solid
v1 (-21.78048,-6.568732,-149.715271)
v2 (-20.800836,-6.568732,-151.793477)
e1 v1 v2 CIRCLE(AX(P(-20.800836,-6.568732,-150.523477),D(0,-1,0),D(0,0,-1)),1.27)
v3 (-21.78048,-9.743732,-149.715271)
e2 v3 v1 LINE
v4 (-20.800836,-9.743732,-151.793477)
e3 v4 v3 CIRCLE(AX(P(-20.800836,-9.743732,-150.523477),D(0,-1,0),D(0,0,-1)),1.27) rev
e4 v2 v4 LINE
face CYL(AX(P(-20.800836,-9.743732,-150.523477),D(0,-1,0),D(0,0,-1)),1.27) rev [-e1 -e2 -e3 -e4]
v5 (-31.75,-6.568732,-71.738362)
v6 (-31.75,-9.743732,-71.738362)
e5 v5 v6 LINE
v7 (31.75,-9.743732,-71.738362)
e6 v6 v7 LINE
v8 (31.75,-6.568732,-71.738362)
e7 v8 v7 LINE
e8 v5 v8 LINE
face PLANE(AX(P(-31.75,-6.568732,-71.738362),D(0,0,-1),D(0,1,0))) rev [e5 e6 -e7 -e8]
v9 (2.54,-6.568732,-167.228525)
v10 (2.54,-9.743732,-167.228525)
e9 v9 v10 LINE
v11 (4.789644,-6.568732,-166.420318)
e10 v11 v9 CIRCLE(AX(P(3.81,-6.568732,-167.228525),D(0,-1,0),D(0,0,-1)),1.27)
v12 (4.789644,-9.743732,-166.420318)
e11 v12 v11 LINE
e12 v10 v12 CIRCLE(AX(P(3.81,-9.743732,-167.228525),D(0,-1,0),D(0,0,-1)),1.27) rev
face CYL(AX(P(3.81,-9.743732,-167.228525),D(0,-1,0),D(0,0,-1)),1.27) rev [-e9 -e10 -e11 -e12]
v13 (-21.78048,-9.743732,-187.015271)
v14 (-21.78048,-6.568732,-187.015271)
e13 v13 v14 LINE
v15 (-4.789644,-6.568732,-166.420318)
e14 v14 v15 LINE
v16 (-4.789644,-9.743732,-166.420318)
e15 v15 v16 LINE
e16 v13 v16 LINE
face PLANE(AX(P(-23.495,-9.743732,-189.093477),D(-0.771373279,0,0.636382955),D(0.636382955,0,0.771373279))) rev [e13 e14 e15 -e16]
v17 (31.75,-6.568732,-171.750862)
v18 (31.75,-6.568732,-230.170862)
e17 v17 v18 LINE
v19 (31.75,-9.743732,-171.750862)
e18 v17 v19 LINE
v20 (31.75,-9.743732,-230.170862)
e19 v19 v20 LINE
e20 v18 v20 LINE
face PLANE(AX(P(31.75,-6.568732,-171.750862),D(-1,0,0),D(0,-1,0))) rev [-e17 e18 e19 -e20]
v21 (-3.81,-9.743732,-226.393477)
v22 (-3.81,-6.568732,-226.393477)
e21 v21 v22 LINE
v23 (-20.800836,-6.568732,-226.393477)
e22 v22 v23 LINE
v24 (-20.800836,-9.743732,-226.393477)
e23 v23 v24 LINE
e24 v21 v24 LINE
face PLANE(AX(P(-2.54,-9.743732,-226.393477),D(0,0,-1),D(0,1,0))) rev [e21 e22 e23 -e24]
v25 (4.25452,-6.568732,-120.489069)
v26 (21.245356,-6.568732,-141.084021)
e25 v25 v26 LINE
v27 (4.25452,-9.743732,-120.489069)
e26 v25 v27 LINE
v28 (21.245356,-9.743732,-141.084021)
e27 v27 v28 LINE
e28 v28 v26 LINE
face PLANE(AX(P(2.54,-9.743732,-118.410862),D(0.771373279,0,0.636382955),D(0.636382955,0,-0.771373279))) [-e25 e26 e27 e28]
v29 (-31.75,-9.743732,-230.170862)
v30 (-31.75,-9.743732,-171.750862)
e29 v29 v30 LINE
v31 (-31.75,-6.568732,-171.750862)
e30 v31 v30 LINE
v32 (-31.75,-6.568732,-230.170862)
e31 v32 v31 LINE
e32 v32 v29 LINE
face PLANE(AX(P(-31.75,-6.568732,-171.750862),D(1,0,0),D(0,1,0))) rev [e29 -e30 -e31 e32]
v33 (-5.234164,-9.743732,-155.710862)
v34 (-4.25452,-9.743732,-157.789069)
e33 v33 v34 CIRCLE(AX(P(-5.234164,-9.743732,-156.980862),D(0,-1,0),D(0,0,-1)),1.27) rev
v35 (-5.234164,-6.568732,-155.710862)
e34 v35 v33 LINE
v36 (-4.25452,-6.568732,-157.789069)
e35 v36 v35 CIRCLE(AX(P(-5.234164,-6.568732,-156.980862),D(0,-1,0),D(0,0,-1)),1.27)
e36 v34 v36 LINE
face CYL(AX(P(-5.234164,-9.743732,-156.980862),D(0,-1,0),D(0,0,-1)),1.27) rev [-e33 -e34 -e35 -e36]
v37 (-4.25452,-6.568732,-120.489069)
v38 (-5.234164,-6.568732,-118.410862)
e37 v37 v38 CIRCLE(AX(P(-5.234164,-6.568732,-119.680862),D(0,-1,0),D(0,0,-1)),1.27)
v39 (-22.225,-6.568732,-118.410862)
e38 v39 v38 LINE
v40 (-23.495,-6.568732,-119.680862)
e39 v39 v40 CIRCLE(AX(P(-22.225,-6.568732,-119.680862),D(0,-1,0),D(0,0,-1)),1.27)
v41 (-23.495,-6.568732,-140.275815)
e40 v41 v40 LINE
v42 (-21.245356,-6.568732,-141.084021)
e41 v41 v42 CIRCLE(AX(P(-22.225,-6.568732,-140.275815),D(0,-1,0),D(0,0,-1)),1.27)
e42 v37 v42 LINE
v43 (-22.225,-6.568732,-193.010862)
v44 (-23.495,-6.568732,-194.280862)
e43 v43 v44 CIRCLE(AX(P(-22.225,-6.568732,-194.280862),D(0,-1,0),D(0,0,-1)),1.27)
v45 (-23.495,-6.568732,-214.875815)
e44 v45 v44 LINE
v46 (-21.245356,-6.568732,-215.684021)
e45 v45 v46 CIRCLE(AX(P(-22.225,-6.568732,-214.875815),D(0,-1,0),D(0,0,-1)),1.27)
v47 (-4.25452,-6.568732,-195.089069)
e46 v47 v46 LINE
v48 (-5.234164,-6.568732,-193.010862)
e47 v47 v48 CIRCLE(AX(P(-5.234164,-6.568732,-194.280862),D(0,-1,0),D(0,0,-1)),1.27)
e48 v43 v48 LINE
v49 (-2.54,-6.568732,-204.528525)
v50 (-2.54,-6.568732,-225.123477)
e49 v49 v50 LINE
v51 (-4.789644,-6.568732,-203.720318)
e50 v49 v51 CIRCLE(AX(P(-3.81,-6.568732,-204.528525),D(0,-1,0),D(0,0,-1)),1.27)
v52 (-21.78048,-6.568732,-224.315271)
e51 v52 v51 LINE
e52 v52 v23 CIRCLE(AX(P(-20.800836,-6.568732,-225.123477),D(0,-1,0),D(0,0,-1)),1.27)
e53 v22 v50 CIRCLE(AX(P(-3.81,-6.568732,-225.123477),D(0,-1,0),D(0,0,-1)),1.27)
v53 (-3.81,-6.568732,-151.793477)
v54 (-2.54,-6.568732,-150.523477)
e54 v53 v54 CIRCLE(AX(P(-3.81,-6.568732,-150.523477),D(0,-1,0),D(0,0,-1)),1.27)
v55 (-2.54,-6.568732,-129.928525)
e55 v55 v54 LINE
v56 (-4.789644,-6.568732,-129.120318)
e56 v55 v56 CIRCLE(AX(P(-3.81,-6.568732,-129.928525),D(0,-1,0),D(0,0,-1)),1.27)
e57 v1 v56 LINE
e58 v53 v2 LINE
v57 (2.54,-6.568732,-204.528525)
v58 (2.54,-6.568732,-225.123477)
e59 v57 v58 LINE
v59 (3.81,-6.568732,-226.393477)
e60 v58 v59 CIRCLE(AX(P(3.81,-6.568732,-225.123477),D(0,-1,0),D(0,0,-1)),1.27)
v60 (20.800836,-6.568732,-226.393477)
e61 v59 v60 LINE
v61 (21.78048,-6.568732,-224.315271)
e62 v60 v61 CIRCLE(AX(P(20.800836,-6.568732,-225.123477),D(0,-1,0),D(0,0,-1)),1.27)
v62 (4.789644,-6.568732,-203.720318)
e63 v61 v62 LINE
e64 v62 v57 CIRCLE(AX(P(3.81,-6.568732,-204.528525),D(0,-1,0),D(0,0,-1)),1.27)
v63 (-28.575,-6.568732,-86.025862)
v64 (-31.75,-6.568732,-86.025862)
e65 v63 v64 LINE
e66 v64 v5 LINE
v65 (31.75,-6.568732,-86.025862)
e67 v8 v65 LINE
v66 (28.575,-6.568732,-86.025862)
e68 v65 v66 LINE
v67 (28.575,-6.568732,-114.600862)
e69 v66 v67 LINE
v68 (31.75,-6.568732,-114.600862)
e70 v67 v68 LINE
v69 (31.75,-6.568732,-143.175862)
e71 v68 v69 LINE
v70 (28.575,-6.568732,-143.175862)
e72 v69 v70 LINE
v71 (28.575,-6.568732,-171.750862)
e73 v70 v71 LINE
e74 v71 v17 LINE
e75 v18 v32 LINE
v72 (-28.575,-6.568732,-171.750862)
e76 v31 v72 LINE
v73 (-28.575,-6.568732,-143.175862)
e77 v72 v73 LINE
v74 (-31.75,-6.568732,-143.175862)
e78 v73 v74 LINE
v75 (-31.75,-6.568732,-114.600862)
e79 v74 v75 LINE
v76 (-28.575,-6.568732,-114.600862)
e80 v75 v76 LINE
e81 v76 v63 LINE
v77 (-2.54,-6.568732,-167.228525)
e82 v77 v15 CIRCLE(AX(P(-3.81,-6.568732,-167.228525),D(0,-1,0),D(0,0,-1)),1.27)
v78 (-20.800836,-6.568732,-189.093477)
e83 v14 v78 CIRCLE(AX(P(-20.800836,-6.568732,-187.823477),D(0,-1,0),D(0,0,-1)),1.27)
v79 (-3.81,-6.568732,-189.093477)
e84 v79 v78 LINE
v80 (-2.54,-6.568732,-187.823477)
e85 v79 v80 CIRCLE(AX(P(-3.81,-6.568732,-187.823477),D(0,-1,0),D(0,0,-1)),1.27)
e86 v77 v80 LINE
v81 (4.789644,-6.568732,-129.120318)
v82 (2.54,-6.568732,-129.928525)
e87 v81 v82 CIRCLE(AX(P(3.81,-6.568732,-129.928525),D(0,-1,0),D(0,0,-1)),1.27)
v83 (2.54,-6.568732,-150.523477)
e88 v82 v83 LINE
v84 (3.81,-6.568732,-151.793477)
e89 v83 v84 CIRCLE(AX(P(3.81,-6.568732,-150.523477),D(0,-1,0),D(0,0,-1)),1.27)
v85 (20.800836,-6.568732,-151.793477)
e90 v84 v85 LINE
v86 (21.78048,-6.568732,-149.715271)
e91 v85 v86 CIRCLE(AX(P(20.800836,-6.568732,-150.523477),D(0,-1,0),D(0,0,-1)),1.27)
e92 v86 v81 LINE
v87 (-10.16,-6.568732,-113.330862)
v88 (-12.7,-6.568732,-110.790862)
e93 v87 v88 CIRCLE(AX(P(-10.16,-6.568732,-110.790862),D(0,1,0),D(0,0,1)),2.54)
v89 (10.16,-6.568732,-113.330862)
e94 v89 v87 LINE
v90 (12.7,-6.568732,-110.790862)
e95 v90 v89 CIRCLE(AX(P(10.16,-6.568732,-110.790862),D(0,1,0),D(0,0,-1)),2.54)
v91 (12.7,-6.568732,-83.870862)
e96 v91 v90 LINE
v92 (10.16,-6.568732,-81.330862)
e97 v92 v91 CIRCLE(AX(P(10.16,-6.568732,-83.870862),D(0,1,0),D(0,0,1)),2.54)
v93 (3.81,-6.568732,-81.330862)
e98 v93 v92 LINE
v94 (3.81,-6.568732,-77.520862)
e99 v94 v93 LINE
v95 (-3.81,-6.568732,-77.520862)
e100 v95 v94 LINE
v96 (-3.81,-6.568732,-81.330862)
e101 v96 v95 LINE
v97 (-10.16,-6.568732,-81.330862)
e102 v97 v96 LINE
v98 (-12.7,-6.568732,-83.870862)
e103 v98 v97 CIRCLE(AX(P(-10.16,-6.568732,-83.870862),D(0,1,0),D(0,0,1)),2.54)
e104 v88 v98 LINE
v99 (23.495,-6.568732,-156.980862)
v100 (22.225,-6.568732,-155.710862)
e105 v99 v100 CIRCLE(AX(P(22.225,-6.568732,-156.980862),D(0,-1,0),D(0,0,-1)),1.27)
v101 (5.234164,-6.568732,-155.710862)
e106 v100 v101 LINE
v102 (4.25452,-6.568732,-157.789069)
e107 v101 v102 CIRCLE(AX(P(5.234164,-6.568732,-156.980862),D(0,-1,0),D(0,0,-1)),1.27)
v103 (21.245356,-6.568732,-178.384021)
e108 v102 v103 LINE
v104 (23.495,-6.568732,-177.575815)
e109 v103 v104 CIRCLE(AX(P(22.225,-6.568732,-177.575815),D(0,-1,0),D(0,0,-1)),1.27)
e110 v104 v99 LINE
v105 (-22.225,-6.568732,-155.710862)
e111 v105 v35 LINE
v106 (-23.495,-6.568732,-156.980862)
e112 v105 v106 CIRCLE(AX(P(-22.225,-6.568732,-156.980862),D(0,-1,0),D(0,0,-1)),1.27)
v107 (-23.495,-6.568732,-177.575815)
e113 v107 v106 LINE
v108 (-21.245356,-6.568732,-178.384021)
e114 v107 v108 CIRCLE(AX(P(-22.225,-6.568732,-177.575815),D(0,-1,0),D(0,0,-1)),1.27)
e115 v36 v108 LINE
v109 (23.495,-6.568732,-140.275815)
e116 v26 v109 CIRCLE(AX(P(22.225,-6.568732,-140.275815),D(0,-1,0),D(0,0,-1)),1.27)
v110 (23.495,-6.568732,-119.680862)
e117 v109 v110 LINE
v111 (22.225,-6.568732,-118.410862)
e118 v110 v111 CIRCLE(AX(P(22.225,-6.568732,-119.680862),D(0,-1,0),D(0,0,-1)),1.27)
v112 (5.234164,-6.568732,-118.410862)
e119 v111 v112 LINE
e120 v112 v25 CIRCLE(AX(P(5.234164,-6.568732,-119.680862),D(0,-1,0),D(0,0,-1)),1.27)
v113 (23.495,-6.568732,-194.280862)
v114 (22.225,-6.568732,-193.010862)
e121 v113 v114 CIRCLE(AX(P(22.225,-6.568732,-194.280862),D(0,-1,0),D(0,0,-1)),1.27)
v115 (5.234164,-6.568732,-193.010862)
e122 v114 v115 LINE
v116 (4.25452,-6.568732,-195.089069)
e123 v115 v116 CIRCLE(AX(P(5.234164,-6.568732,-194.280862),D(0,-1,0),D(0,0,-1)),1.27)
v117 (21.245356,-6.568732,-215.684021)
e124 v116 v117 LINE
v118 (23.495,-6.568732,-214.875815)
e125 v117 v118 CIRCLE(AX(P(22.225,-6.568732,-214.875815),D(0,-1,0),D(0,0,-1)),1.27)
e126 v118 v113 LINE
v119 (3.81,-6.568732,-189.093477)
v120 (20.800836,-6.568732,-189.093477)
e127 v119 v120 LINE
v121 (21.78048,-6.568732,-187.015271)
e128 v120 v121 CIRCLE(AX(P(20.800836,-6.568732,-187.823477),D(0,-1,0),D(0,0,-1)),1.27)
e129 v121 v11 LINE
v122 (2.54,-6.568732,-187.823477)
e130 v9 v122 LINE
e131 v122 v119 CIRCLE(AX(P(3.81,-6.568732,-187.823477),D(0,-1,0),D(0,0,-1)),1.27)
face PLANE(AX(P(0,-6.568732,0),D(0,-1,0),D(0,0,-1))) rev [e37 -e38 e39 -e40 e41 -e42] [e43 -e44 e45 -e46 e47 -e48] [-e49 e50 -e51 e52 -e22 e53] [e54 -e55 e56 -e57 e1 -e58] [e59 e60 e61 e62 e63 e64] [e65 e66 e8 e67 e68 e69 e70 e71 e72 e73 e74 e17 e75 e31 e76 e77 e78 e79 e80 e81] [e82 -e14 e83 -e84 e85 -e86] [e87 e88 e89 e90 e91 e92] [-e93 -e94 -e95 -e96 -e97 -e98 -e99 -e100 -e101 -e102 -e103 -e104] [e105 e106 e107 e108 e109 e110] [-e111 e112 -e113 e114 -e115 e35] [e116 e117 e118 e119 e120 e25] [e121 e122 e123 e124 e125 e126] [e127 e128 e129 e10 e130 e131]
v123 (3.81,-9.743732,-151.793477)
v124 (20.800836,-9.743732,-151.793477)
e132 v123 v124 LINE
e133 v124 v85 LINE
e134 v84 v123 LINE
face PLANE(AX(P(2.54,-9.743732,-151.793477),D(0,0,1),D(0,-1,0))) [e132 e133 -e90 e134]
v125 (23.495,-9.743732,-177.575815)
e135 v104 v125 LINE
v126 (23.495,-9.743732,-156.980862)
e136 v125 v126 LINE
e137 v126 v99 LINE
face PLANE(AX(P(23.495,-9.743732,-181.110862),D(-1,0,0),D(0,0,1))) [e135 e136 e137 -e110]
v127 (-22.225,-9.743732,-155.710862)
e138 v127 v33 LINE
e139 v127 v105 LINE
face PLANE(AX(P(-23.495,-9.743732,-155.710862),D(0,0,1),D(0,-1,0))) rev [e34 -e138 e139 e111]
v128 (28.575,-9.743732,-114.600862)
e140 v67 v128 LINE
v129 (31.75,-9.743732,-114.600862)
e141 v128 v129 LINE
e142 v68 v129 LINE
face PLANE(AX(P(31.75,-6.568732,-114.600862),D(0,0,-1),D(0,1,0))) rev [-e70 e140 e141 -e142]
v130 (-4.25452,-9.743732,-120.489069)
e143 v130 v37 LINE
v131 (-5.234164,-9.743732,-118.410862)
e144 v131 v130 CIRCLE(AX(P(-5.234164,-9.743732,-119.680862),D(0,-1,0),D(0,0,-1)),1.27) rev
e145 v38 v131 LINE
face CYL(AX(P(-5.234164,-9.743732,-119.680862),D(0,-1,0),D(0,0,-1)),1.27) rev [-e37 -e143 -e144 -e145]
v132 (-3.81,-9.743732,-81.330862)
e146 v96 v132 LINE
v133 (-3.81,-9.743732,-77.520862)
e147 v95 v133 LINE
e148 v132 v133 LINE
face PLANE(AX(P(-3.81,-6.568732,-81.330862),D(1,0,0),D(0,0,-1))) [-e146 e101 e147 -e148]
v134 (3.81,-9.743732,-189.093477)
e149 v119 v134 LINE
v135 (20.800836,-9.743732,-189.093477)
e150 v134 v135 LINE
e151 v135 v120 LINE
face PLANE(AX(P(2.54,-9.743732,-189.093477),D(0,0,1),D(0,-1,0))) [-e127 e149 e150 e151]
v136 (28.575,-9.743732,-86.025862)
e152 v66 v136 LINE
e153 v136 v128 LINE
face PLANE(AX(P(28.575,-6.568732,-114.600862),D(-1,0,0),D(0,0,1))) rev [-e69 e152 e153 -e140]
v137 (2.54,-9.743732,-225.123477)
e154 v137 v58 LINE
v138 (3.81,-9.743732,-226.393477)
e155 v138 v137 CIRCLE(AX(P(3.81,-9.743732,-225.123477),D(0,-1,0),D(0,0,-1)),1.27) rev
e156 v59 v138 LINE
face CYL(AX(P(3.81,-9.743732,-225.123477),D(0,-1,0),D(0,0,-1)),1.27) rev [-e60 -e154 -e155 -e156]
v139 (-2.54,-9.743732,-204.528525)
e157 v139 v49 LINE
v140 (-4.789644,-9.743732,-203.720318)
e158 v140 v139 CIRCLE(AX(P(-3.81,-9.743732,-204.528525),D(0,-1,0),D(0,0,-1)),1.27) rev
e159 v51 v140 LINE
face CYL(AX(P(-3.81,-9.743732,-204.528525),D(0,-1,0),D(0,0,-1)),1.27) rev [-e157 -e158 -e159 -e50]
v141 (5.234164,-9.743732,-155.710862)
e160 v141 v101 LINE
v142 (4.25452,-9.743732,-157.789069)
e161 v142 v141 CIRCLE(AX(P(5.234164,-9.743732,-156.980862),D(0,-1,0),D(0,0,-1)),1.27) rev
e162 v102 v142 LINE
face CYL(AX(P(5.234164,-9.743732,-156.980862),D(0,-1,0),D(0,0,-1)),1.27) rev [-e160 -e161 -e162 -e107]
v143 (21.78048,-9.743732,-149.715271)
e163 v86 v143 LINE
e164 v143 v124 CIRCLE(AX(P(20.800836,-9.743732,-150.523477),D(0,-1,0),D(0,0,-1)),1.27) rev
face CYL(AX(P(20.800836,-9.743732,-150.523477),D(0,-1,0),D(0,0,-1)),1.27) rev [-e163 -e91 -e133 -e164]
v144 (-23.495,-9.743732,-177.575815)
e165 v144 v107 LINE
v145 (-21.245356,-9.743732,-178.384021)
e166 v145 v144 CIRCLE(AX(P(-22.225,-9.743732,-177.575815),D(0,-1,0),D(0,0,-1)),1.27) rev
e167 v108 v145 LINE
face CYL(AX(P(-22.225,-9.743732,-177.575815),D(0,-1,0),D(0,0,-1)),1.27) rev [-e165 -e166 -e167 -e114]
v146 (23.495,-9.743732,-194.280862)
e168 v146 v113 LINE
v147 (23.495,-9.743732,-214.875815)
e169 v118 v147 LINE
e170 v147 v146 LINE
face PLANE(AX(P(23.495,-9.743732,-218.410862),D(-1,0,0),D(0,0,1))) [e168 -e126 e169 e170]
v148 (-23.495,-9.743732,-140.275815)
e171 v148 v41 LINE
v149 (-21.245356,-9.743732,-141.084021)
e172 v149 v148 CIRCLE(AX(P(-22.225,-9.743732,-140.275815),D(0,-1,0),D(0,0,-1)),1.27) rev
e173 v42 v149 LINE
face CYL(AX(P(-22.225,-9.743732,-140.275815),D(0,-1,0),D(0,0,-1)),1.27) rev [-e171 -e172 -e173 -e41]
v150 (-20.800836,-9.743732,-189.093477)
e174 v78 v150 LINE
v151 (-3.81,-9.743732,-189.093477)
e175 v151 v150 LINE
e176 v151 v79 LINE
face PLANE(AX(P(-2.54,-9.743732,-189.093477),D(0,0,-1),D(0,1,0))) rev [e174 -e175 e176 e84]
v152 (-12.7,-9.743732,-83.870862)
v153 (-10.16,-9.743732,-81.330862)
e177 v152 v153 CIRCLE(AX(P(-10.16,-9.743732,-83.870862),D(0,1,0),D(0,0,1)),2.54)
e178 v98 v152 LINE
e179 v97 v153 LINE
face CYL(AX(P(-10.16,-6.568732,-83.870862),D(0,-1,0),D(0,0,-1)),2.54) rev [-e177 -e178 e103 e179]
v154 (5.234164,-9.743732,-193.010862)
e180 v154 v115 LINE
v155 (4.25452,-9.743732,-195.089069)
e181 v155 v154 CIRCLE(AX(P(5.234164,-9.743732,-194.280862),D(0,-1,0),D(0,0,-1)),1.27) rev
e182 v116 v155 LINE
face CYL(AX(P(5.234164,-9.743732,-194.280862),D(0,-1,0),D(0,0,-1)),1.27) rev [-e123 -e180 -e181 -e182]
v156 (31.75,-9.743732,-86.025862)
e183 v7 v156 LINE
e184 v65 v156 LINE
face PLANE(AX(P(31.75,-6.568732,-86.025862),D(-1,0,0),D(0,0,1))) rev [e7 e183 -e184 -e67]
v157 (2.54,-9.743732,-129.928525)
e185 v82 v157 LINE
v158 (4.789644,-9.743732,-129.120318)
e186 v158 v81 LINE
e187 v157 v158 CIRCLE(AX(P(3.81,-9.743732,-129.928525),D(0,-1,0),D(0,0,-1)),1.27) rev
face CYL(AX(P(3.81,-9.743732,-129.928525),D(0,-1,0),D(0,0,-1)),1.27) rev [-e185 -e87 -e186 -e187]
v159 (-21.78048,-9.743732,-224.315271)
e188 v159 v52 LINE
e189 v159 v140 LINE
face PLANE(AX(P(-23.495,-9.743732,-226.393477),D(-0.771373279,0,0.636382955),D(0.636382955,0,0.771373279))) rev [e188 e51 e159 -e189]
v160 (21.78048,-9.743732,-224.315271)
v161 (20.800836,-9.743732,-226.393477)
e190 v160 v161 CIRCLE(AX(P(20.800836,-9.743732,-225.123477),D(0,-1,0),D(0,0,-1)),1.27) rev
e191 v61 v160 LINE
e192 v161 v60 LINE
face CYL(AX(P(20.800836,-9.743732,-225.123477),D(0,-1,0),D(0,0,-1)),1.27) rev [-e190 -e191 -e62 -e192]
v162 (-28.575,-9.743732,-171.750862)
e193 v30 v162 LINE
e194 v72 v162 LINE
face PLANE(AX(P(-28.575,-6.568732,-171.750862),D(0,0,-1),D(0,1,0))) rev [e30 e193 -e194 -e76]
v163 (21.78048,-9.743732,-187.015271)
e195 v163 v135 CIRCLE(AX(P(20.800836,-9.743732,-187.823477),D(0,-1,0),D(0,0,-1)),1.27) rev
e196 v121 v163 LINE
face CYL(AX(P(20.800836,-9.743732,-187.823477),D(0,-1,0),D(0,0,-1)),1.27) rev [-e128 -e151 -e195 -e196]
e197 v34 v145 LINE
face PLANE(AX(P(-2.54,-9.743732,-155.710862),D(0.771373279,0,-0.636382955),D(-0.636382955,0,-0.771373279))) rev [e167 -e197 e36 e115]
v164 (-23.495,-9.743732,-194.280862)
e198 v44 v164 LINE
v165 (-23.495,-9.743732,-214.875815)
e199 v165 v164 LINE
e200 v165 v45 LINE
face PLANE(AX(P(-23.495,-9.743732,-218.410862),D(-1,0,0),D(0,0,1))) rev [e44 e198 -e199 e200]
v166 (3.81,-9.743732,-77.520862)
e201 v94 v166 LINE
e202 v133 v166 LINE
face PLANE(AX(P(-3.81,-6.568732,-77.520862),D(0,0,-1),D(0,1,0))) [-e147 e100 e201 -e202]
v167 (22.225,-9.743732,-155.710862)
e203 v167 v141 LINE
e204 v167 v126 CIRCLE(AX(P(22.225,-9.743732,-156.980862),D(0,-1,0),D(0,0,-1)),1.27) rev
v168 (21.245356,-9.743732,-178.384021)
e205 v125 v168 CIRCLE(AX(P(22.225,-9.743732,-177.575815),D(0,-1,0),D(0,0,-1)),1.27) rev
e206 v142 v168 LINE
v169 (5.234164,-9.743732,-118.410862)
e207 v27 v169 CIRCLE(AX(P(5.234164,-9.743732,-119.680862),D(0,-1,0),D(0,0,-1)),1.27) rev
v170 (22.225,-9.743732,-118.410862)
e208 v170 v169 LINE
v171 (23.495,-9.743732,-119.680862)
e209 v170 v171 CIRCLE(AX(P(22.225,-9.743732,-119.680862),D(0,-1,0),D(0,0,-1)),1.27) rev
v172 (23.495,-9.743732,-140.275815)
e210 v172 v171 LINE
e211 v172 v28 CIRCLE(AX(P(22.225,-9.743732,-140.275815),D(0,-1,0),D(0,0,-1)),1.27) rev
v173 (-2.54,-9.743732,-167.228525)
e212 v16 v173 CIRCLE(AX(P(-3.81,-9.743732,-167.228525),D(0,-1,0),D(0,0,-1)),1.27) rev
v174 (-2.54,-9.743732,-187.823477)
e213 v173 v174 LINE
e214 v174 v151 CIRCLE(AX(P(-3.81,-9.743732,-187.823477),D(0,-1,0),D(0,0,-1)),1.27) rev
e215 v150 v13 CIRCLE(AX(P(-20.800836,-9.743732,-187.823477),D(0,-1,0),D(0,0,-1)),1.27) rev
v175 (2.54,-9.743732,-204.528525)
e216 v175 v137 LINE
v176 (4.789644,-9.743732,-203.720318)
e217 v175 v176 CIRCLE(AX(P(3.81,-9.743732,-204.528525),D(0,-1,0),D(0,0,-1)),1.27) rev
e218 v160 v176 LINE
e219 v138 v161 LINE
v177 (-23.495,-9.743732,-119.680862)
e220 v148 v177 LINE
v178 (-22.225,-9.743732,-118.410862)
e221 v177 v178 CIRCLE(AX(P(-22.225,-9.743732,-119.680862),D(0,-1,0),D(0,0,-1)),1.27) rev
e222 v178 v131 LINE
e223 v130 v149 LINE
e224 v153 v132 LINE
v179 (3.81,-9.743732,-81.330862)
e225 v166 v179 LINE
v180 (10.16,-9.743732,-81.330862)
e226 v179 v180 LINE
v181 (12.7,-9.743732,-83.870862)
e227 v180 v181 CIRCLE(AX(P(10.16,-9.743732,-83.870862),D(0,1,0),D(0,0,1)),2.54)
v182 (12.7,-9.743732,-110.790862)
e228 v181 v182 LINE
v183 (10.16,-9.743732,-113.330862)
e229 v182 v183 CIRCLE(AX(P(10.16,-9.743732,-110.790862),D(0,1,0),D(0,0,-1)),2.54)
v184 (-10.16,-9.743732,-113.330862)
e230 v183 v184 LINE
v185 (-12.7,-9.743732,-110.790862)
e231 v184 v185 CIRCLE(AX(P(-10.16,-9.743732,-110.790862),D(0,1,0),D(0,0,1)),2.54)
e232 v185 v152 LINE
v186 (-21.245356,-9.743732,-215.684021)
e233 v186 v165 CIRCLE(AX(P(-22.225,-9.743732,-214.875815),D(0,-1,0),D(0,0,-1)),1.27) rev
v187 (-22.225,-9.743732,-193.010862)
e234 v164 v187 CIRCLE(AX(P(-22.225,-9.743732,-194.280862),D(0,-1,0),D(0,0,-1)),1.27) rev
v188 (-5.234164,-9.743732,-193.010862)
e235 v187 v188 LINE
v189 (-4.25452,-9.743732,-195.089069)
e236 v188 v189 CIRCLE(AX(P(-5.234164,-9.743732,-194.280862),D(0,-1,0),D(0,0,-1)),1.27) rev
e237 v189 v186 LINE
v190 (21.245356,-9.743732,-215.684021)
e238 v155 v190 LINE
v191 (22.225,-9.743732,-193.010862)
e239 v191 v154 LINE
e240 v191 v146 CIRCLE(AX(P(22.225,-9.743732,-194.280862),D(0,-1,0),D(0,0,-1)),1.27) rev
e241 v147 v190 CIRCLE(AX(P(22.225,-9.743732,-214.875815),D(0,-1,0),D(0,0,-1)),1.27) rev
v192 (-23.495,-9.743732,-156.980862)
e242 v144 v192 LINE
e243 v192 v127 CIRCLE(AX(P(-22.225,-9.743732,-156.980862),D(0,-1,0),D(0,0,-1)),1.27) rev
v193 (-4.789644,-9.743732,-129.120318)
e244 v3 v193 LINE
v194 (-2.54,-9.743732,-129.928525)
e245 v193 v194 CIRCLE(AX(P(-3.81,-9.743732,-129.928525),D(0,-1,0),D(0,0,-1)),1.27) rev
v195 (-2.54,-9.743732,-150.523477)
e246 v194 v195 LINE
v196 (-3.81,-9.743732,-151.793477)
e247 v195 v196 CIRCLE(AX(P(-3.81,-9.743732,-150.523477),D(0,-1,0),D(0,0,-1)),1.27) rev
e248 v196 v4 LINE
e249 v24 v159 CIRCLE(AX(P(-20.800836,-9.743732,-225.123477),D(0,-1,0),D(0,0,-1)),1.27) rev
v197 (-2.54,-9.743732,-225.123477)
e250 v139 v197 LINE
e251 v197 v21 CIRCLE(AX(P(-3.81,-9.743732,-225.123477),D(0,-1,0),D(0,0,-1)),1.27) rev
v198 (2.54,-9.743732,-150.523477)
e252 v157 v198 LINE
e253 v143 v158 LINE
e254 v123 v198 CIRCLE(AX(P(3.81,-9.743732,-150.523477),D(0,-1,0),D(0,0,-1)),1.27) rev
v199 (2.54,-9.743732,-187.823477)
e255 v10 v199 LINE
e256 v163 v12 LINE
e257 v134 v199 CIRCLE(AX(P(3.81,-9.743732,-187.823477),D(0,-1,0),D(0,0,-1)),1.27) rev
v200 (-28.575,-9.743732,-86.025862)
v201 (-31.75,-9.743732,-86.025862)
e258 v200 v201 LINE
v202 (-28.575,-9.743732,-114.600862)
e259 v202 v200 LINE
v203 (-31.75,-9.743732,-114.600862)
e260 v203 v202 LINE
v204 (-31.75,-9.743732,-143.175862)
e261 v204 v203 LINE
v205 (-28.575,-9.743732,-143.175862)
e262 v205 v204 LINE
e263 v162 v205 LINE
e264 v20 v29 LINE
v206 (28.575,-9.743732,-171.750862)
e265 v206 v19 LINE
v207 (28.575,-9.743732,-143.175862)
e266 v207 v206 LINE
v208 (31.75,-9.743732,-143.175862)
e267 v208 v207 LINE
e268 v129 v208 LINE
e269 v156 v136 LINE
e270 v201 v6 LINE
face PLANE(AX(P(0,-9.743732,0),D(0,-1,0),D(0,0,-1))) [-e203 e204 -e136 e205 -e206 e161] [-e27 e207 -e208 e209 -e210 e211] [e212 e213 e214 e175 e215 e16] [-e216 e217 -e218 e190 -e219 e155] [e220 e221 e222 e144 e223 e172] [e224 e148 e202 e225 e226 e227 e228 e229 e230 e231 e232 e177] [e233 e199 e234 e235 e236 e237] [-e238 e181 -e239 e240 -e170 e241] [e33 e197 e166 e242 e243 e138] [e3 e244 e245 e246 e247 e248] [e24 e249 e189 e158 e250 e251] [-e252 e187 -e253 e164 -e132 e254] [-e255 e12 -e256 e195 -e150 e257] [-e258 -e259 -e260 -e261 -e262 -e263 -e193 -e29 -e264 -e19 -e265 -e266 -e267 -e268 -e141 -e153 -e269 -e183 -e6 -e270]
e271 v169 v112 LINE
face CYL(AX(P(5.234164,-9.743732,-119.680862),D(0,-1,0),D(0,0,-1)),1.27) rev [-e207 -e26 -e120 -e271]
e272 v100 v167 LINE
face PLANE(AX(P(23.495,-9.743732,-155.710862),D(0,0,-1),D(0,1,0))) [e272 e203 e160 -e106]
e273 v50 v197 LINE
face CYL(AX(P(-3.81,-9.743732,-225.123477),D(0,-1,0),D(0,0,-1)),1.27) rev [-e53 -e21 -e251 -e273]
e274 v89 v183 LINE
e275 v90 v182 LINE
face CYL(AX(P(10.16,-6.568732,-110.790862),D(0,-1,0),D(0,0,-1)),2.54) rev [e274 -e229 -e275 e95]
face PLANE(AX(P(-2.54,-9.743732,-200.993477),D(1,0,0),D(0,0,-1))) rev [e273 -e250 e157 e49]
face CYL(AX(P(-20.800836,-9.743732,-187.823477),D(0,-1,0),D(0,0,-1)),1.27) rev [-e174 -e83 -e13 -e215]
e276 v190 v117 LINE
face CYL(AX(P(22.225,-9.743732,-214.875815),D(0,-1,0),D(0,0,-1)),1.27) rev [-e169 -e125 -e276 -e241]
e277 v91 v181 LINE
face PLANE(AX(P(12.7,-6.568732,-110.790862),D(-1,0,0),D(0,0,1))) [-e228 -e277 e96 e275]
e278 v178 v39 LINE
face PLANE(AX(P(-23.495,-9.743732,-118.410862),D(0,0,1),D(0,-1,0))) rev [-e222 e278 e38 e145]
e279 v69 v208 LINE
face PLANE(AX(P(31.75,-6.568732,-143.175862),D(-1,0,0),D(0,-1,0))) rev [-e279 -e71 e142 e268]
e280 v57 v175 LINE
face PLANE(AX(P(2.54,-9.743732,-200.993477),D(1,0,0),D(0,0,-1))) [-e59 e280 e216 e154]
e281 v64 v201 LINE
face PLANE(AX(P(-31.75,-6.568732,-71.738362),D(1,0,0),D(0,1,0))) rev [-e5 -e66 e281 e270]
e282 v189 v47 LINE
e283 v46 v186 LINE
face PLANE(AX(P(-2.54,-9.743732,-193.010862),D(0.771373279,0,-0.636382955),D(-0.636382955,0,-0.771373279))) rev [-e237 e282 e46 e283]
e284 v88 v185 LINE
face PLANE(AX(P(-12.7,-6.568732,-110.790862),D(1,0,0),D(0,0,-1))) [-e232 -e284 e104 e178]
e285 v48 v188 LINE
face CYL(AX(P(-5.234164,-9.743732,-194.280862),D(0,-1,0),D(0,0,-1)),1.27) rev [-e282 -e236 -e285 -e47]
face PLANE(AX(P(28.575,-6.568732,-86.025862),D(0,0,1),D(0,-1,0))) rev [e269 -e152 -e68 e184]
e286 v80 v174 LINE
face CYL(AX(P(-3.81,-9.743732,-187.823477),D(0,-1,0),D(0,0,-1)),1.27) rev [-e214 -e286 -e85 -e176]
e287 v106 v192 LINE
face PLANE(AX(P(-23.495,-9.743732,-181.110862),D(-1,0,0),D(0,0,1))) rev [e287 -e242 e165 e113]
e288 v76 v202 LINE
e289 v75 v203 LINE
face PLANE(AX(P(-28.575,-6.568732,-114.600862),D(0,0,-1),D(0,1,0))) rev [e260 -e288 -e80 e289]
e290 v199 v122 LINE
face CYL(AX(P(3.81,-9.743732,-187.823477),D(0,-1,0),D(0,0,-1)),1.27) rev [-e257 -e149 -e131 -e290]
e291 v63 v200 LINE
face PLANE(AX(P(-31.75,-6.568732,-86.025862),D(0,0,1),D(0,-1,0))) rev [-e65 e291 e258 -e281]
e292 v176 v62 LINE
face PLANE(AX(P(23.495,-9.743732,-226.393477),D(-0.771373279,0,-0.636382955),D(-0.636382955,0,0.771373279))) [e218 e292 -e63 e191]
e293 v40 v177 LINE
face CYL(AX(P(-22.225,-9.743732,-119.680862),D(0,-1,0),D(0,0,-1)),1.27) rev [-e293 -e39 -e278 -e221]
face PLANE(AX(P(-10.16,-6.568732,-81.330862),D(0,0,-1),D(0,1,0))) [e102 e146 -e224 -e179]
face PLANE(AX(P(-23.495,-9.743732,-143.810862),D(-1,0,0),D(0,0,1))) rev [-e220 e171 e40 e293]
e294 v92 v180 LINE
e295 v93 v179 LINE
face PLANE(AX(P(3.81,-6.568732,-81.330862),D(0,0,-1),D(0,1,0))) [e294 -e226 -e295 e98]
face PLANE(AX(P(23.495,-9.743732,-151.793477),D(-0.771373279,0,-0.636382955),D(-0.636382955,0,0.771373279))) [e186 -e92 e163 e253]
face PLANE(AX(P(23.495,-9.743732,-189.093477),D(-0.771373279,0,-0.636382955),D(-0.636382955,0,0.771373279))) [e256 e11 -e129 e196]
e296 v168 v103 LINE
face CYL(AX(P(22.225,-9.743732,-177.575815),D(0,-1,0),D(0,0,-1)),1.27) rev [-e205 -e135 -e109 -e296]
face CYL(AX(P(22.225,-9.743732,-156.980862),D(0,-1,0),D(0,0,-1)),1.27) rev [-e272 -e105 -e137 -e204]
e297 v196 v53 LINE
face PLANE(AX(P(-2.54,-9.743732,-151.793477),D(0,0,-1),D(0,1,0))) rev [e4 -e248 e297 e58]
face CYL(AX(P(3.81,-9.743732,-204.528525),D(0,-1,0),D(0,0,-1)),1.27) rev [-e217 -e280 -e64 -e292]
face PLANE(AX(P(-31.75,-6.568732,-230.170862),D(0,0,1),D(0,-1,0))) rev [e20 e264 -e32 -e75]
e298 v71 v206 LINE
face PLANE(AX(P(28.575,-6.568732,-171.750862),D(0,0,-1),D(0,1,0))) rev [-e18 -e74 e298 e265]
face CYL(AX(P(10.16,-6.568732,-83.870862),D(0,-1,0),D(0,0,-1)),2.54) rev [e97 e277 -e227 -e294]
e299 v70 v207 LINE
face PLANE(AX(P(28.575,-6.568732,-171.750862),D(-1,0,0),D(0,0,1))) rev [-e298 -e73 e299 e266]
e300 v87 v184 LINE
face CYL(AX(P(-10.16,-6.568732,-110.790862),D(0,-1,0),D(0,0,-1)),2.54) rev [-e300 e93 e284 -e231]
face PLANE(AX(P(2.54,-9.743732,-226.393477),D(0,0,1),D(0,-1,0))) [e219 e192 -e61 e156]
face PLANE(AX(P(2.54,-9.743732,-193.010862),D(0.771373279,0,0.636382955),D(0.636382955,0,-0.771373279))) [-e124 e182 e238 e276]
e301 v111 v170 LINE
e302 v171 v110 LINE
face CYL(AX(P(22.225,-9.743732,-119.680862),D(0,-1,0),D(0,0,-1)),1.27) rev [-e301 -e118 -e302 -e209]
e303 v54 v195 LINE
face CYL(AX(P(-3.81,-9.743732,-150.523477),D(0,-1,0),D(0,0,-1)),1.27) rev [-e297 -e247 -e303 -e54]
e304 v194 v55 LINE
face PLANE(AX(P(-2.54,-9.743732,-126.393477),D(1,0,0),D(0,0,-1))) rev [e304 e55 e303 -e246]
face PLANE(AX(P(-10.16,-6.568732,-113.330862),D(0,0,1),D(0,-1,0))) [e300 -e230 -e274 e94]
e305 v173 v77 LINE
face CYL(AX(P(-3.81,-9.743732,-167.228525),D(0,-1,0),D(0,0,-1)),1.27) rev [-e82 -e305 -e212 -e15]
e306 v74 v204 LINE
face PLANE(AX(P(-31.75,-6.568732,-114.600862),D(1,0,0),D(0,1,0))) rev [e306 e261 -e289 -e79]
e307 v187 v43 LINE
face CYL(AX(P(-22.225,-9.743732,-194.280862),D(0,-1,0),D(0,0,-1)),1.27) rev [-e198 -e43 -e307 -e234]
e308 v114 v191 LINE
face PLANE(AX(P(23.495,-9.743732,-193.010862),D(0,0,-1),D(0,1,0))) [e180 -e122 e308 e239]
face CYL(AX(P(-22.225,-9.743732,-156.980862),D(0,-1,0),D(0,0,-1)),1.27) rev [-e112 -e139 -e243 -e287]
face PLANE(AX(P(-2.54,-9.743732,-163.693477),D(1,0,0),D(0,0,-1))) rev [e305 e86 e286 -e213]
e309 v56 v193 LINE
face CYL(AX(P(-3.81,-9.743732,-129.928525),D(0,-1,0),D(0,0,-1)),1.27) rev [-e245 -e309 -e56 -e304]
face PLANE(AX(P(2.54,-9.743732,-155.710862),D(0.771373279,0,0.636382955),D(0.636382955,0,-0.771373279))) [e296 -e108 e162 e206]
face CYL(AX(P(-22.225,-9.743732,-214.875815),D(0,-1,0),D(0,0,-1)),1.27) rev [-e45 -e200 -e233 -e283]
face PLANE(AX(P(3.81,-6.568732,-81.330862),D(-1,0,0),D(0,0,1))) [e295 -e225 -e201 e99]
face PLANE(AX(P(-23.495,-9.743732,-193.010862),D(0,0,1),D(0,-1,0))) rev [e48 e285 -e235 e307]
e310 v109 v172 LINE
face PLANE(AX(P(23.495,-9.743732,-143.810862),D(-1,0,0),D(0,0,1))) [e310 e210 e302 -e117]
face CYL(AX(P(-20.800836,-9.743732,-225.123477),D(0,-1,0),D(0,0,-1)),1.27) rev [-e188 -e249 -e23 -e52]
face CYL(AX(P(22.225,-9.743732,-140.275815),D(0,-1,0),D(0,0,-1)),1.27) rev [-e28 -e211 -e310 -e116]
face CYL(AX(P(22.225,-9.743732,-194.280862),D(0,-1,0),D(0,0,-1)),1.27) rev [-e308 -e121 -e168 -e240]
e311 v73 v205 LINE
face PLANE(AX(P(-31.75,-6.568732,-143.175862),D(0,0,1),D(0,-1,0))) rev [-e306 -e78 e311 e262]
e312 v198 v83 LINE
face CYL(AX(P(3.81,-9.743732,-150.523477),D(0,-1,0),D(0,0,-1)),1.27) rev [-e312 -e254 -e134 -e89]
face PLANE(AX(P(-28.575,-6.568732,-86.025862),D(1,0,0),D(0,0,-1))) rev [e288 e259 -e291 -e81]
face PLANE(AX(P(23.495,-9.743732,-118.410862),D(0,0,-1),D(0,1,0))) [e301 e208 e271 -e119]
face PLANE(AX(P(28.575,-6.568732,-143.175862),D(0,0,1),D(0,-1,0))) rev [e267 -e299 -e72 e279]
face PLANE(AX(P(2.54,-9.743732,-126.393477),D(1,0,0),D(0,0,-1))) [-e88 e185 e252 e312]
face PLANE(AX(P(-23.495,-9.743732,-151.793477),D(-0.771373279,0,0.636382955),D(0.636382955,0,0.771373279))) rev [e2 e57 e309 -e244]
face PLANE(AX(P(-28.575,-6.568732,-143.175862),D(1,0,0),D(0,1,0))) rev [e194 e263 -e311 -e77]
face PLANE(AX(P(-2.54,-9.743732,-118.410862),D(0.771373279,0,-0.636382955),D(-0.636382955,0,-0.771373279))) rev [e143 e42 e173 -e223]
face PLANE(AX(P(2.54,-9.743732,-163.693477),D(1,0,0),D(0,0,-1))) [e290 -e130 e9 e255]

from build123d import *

# Parameters (mm, degrees)
BOSS_EXTRUDE1_DEPTH    = 3.175
CUT_EXTRUDE1_DEPTH     = 233.372048712
FILLET1_R              = 1.27
LPATTERN1_COUNT        = 3
LPATTERN1_PITCH        = 37.3
FILLET1_OF_LPATTERN1_R = 1.27
MIRROR1_START          = -9.743731804
MIRROR1_DEPTH          = 3.175


# Read off the part's stored shape, not the designer's step: Mirror1
with BuildPart() as part:
    # Sketch1 → Boss-Extrude1 (new body)
    with BuildSketch(Plane(origin=(0, -9.743731804, 0), x_dir=(1, 0, 0), z_dir=(0, 1, 0))):
        Polygon((-31.75, 143.175862399), (-28.575, 143.175862399), (-28.575, 171.750862399), (-31.75, 171.750862399), (-31.75, 230.170862399), (31.75, 230.170862399), (31.75, 171.750862399), (28.575, 171.750862399), (28.575, 143.175862399), (31.75, 143.175862399), (31.75, 114.600862399), (28.575, 114.600862399), (28.575, 86.025862399), (31.75, 86.025862399), (31.75, 71.738362399), (-31.75, 71.738362399), (-31.75, 86.025862399), (-28.575, 86.025862399), (-28.575, 114.600862399), (-31.75, 114.600862399), align=None)
        with BuildLine():
            Line((-10.16, 113.330862399), (10.16, 113.330862399))
            ThreePointArc((10.16, 113.330862399), (11.956051224, 112.586913623), (12.7, 110.790862399))
            Line((12.7, 110.790862399), (12.7, 83.870862391))
            ThreePointArc((12.7, 83.870862391), (11.956051224, 82.074811167), (10.16, 81.330862391))
            Line((10.16, 81.330862391), (3.81, 81.330862391))
            Line((3.81, 81.330862391), (3.81, 77.520862391))
            Line((3.81, 77.520862391), (-3.81, 77.520862391))
            Line((-3.81, 77.520862391), (-3.81, 81.330862391))
            Line((-3.81, 81.330862391), (-10.16, 81.330862391))
            ThreePointArc((-10.16, 81.330862391), (-11.956051224, 82.074811167), (-12.7, 83.870862391))
            Line((-12.7, 83.870862391), (-12.7, 110.790862399))
            ThreePointArc((-12.7, 110.790862399), (-11.956051224, 112.586913623), (-10.16, 113.330862399))
        make_face(mode=Mode.SUBTRACT)
    extrude(amount=BOSS_EXTRUDE1_DEPTH)

    # Sketch2 → Cut-Extrude1 (cut, through all)
    with BuildSketch(Plane(origin=(0, -6.568731804, 0), x_dir=(1, 0, 0), z_dir=(0, 1, 0))):
        Polygon((-23.495, 143.810862399), (-23.495, 118.410862399), (-2.54, 118.410862399), align=None)
        Polygon((-23.495, 151.793477209), (-2.54, 126.393477209), (-2.54, 151.793477209), align=None)
    cut_extrude1 = extrude(amount=-CUT_EXTRUDE1_DEPTH, mode=Mode.SUBTRACT)

    # Fillet1
    fillet1_edges = [part.edges().sort_by_distance(p)[0] for p in [
        (-23.495, -8.156231804, -151.793477209),
        (-2.54, -8.156231804, -151.793477209),
        (-2.54, -8.156231804, -126.393477209),
        (-23.495, -8.156231804, -143.810862399),
        (-2.54, -8.156231804, -118.410862399),
        (-23.495, -8.156231804, -118.410862399),
    ]]
    fillet(fillet1_edges, radius=FILLET1_R)

    # LPattern1: Cut-Extrude1 ×3
    with Locations(*[(0, 0, -i * LPATTERN1_PITCH) for i in range(1, LPATTERN1_COUNT)]):
        add(cut_extrude1, mode=Mode.SUBTRACT)

    # Fillet1 of LPattern1
    fillet1_of_lpattern1_edges = [part.edges().sort_by_distance(p)[0] for p in [
        (-23.495, -8.156231804, -189.093477209),
        (-2.54, -8.156231804, -189.093477209),
        (-2.54, -8.156231804, -163.693477209),
        (-23.495, -8.156231804, -181.110862399),
        (-2.54, -8.156231804, -155.710862399),
        (-23.495, -8.156231804, -155.710862399),
        (-23.495, -8.156231804, -226.393477209),
        (-2.54, -8.156231804, -226.393477209),
        (-2.54, -8.156231804, -200.993477209),
        (-23.495, -8.156231804, -218.410862399),
        (-2.54, -8.156231804, -193.010862399),
        (-23.495, -8.156231804, -193.010862399),
    ]]
    fillet(fillet1_of_lpattern1_edges, radius=FILLET1_OF_LPATTERN1_R)

    # Mirror1 outline → Mirror1 (cut)
    with BuildSketch(Plane(origin=(0, 0, 0), x_dir=(1, 0, 0), z_dir=(0, 1, 0)).offset(MIRROR1_START)):
        with BuildLine():
            Line((20.800835695, 226.393477209), (3.81, 226.393477209))
            ThreePointArc((3.81, 226.393477209), (2.911974388, 226.021502821), (2.54, 225.123477209))
            Line((2.54, 225.123477209), (2.54, 204.528524851))
            ThreePointArc((2.54, 204.528524851), (3.380609712, 203.333316091), (4.789644064, 203.720318499))
            Line((4.789644064, 203.720318499), (21.780479759, 224.315270857))
            ThreePointArc((21.780479759, 224.315270857), (21.949600699, 225.664992644), (20.800835695, 226.393477209))
        make_face()
        with BuildLine():
            Line((5.234164305, 193.010862399), (22.225, 193.010862399))
            ThreePointArc((22.225, 193.010862399), (23.123025612, 193.382836787), (23.495, 194.280862399))
            Line((23.495, 194.280862399), (23.495, 214.875814757))
            ThreePointArc((23.495, 214.875814757), (22.654390288, 216.071023517), (21.245355936, 215.68402111))
            Line((21.245355936, 215.68402111), (4.254520241, 195.089068752))
            ThreePointArc((4.254520241, 195.089068752), (4.085399301, 193.739346964), (5.234164305, 193.010862399))
        make_face()
        with BuildLine():
            Line((5.234164305, 118.410862399), (22.225, 118.410862399))
            ThreePointArc((22.225, 118.410862399), (23.123025612, 118.782836787), (23.495, 119.680862399))
            Line((23.495, 119.680862399), (23.495, 140.275814757))
            ThreePointArc((23.495, 140.275814757), (22.654390288, 141.471023517), (21.245355936, 141.08402111))
            Line((21.245355936, 141.08402111), (4.254520241, 120.489068752))
            ThreePointArc((4.254520241, 120.489068752), (4.085399301, 119.139346964), (5.234164305, 118.410862399))
        make_face()
        with BuildLine():
            Line((20.800835695, 151.793477209), (3.81, 151.793477209))
            ThreePointArc((3.81, 151.793477209), (2.911974388, 151.421502821), (2.54, 150.523477209))
            Line((2.54, 150.523477209), (2.54, 129.928524851))
            ThreePointArc((2.54, 129.928524851), (3.380609712, 128.733316091), (4.789644064, 129.120318499))
            Line((4.789644064, 129.120318499), (21.780479759, 149.715270857))
            ThreePointArc((21.780479759, 149.715270857), (21.949600699, 151.064992644), (20.800835695, 151.793477209))
        make_face()
        with BuildLine():
            Line((5.234164305, 155.710862399), (22.225, 155.710862399))
            ThreePointArc((22.225, 155.710862399), (23.123025612, 156.082836787), (23.495, 156.980862399))
            Line((23.495, 156.980862399), (23.495, 177.575814757))
            ThreePointArc((23.495, 177.575814757), (22.654390288, 178.771023517), (21.245355936, 178.38402111))
            Line((21.245355936, 178.38402111), (4.254520241, 157.789068752))
            ThreePointArc((4.254520241, 157.789068752), (4.085399301, 156.439346964), (5.234164305, 155.710862399))
        make_face()
        with BuildLine():
            Line((20.800835695, 189.093477209), (3.81, 189.093477209))
            ThreePointArc((3.81, 189.093477209), (2.911974388, 188.721502821), (2.54, 187.823477209))
            Line((2.54, 187.823477209), (2.54, 167.228524851))
            ThreePointArc((2.54, 167.228524851), (3.380609712, 166.033316091), (4.789644064, 166.420318499))
            Line((4.789644064, 166.420318499), (21.780479759, 187.015270857))
            ThreePointArc((21.780479759, 187.015270857), (21.949600699, 188.364992644), (20.800835695, 189.093477209))
        make_face()
    extrude(amount=MIRROR1_DEPTH, mode=Mode.SUBTRACT)


solid = part.part
